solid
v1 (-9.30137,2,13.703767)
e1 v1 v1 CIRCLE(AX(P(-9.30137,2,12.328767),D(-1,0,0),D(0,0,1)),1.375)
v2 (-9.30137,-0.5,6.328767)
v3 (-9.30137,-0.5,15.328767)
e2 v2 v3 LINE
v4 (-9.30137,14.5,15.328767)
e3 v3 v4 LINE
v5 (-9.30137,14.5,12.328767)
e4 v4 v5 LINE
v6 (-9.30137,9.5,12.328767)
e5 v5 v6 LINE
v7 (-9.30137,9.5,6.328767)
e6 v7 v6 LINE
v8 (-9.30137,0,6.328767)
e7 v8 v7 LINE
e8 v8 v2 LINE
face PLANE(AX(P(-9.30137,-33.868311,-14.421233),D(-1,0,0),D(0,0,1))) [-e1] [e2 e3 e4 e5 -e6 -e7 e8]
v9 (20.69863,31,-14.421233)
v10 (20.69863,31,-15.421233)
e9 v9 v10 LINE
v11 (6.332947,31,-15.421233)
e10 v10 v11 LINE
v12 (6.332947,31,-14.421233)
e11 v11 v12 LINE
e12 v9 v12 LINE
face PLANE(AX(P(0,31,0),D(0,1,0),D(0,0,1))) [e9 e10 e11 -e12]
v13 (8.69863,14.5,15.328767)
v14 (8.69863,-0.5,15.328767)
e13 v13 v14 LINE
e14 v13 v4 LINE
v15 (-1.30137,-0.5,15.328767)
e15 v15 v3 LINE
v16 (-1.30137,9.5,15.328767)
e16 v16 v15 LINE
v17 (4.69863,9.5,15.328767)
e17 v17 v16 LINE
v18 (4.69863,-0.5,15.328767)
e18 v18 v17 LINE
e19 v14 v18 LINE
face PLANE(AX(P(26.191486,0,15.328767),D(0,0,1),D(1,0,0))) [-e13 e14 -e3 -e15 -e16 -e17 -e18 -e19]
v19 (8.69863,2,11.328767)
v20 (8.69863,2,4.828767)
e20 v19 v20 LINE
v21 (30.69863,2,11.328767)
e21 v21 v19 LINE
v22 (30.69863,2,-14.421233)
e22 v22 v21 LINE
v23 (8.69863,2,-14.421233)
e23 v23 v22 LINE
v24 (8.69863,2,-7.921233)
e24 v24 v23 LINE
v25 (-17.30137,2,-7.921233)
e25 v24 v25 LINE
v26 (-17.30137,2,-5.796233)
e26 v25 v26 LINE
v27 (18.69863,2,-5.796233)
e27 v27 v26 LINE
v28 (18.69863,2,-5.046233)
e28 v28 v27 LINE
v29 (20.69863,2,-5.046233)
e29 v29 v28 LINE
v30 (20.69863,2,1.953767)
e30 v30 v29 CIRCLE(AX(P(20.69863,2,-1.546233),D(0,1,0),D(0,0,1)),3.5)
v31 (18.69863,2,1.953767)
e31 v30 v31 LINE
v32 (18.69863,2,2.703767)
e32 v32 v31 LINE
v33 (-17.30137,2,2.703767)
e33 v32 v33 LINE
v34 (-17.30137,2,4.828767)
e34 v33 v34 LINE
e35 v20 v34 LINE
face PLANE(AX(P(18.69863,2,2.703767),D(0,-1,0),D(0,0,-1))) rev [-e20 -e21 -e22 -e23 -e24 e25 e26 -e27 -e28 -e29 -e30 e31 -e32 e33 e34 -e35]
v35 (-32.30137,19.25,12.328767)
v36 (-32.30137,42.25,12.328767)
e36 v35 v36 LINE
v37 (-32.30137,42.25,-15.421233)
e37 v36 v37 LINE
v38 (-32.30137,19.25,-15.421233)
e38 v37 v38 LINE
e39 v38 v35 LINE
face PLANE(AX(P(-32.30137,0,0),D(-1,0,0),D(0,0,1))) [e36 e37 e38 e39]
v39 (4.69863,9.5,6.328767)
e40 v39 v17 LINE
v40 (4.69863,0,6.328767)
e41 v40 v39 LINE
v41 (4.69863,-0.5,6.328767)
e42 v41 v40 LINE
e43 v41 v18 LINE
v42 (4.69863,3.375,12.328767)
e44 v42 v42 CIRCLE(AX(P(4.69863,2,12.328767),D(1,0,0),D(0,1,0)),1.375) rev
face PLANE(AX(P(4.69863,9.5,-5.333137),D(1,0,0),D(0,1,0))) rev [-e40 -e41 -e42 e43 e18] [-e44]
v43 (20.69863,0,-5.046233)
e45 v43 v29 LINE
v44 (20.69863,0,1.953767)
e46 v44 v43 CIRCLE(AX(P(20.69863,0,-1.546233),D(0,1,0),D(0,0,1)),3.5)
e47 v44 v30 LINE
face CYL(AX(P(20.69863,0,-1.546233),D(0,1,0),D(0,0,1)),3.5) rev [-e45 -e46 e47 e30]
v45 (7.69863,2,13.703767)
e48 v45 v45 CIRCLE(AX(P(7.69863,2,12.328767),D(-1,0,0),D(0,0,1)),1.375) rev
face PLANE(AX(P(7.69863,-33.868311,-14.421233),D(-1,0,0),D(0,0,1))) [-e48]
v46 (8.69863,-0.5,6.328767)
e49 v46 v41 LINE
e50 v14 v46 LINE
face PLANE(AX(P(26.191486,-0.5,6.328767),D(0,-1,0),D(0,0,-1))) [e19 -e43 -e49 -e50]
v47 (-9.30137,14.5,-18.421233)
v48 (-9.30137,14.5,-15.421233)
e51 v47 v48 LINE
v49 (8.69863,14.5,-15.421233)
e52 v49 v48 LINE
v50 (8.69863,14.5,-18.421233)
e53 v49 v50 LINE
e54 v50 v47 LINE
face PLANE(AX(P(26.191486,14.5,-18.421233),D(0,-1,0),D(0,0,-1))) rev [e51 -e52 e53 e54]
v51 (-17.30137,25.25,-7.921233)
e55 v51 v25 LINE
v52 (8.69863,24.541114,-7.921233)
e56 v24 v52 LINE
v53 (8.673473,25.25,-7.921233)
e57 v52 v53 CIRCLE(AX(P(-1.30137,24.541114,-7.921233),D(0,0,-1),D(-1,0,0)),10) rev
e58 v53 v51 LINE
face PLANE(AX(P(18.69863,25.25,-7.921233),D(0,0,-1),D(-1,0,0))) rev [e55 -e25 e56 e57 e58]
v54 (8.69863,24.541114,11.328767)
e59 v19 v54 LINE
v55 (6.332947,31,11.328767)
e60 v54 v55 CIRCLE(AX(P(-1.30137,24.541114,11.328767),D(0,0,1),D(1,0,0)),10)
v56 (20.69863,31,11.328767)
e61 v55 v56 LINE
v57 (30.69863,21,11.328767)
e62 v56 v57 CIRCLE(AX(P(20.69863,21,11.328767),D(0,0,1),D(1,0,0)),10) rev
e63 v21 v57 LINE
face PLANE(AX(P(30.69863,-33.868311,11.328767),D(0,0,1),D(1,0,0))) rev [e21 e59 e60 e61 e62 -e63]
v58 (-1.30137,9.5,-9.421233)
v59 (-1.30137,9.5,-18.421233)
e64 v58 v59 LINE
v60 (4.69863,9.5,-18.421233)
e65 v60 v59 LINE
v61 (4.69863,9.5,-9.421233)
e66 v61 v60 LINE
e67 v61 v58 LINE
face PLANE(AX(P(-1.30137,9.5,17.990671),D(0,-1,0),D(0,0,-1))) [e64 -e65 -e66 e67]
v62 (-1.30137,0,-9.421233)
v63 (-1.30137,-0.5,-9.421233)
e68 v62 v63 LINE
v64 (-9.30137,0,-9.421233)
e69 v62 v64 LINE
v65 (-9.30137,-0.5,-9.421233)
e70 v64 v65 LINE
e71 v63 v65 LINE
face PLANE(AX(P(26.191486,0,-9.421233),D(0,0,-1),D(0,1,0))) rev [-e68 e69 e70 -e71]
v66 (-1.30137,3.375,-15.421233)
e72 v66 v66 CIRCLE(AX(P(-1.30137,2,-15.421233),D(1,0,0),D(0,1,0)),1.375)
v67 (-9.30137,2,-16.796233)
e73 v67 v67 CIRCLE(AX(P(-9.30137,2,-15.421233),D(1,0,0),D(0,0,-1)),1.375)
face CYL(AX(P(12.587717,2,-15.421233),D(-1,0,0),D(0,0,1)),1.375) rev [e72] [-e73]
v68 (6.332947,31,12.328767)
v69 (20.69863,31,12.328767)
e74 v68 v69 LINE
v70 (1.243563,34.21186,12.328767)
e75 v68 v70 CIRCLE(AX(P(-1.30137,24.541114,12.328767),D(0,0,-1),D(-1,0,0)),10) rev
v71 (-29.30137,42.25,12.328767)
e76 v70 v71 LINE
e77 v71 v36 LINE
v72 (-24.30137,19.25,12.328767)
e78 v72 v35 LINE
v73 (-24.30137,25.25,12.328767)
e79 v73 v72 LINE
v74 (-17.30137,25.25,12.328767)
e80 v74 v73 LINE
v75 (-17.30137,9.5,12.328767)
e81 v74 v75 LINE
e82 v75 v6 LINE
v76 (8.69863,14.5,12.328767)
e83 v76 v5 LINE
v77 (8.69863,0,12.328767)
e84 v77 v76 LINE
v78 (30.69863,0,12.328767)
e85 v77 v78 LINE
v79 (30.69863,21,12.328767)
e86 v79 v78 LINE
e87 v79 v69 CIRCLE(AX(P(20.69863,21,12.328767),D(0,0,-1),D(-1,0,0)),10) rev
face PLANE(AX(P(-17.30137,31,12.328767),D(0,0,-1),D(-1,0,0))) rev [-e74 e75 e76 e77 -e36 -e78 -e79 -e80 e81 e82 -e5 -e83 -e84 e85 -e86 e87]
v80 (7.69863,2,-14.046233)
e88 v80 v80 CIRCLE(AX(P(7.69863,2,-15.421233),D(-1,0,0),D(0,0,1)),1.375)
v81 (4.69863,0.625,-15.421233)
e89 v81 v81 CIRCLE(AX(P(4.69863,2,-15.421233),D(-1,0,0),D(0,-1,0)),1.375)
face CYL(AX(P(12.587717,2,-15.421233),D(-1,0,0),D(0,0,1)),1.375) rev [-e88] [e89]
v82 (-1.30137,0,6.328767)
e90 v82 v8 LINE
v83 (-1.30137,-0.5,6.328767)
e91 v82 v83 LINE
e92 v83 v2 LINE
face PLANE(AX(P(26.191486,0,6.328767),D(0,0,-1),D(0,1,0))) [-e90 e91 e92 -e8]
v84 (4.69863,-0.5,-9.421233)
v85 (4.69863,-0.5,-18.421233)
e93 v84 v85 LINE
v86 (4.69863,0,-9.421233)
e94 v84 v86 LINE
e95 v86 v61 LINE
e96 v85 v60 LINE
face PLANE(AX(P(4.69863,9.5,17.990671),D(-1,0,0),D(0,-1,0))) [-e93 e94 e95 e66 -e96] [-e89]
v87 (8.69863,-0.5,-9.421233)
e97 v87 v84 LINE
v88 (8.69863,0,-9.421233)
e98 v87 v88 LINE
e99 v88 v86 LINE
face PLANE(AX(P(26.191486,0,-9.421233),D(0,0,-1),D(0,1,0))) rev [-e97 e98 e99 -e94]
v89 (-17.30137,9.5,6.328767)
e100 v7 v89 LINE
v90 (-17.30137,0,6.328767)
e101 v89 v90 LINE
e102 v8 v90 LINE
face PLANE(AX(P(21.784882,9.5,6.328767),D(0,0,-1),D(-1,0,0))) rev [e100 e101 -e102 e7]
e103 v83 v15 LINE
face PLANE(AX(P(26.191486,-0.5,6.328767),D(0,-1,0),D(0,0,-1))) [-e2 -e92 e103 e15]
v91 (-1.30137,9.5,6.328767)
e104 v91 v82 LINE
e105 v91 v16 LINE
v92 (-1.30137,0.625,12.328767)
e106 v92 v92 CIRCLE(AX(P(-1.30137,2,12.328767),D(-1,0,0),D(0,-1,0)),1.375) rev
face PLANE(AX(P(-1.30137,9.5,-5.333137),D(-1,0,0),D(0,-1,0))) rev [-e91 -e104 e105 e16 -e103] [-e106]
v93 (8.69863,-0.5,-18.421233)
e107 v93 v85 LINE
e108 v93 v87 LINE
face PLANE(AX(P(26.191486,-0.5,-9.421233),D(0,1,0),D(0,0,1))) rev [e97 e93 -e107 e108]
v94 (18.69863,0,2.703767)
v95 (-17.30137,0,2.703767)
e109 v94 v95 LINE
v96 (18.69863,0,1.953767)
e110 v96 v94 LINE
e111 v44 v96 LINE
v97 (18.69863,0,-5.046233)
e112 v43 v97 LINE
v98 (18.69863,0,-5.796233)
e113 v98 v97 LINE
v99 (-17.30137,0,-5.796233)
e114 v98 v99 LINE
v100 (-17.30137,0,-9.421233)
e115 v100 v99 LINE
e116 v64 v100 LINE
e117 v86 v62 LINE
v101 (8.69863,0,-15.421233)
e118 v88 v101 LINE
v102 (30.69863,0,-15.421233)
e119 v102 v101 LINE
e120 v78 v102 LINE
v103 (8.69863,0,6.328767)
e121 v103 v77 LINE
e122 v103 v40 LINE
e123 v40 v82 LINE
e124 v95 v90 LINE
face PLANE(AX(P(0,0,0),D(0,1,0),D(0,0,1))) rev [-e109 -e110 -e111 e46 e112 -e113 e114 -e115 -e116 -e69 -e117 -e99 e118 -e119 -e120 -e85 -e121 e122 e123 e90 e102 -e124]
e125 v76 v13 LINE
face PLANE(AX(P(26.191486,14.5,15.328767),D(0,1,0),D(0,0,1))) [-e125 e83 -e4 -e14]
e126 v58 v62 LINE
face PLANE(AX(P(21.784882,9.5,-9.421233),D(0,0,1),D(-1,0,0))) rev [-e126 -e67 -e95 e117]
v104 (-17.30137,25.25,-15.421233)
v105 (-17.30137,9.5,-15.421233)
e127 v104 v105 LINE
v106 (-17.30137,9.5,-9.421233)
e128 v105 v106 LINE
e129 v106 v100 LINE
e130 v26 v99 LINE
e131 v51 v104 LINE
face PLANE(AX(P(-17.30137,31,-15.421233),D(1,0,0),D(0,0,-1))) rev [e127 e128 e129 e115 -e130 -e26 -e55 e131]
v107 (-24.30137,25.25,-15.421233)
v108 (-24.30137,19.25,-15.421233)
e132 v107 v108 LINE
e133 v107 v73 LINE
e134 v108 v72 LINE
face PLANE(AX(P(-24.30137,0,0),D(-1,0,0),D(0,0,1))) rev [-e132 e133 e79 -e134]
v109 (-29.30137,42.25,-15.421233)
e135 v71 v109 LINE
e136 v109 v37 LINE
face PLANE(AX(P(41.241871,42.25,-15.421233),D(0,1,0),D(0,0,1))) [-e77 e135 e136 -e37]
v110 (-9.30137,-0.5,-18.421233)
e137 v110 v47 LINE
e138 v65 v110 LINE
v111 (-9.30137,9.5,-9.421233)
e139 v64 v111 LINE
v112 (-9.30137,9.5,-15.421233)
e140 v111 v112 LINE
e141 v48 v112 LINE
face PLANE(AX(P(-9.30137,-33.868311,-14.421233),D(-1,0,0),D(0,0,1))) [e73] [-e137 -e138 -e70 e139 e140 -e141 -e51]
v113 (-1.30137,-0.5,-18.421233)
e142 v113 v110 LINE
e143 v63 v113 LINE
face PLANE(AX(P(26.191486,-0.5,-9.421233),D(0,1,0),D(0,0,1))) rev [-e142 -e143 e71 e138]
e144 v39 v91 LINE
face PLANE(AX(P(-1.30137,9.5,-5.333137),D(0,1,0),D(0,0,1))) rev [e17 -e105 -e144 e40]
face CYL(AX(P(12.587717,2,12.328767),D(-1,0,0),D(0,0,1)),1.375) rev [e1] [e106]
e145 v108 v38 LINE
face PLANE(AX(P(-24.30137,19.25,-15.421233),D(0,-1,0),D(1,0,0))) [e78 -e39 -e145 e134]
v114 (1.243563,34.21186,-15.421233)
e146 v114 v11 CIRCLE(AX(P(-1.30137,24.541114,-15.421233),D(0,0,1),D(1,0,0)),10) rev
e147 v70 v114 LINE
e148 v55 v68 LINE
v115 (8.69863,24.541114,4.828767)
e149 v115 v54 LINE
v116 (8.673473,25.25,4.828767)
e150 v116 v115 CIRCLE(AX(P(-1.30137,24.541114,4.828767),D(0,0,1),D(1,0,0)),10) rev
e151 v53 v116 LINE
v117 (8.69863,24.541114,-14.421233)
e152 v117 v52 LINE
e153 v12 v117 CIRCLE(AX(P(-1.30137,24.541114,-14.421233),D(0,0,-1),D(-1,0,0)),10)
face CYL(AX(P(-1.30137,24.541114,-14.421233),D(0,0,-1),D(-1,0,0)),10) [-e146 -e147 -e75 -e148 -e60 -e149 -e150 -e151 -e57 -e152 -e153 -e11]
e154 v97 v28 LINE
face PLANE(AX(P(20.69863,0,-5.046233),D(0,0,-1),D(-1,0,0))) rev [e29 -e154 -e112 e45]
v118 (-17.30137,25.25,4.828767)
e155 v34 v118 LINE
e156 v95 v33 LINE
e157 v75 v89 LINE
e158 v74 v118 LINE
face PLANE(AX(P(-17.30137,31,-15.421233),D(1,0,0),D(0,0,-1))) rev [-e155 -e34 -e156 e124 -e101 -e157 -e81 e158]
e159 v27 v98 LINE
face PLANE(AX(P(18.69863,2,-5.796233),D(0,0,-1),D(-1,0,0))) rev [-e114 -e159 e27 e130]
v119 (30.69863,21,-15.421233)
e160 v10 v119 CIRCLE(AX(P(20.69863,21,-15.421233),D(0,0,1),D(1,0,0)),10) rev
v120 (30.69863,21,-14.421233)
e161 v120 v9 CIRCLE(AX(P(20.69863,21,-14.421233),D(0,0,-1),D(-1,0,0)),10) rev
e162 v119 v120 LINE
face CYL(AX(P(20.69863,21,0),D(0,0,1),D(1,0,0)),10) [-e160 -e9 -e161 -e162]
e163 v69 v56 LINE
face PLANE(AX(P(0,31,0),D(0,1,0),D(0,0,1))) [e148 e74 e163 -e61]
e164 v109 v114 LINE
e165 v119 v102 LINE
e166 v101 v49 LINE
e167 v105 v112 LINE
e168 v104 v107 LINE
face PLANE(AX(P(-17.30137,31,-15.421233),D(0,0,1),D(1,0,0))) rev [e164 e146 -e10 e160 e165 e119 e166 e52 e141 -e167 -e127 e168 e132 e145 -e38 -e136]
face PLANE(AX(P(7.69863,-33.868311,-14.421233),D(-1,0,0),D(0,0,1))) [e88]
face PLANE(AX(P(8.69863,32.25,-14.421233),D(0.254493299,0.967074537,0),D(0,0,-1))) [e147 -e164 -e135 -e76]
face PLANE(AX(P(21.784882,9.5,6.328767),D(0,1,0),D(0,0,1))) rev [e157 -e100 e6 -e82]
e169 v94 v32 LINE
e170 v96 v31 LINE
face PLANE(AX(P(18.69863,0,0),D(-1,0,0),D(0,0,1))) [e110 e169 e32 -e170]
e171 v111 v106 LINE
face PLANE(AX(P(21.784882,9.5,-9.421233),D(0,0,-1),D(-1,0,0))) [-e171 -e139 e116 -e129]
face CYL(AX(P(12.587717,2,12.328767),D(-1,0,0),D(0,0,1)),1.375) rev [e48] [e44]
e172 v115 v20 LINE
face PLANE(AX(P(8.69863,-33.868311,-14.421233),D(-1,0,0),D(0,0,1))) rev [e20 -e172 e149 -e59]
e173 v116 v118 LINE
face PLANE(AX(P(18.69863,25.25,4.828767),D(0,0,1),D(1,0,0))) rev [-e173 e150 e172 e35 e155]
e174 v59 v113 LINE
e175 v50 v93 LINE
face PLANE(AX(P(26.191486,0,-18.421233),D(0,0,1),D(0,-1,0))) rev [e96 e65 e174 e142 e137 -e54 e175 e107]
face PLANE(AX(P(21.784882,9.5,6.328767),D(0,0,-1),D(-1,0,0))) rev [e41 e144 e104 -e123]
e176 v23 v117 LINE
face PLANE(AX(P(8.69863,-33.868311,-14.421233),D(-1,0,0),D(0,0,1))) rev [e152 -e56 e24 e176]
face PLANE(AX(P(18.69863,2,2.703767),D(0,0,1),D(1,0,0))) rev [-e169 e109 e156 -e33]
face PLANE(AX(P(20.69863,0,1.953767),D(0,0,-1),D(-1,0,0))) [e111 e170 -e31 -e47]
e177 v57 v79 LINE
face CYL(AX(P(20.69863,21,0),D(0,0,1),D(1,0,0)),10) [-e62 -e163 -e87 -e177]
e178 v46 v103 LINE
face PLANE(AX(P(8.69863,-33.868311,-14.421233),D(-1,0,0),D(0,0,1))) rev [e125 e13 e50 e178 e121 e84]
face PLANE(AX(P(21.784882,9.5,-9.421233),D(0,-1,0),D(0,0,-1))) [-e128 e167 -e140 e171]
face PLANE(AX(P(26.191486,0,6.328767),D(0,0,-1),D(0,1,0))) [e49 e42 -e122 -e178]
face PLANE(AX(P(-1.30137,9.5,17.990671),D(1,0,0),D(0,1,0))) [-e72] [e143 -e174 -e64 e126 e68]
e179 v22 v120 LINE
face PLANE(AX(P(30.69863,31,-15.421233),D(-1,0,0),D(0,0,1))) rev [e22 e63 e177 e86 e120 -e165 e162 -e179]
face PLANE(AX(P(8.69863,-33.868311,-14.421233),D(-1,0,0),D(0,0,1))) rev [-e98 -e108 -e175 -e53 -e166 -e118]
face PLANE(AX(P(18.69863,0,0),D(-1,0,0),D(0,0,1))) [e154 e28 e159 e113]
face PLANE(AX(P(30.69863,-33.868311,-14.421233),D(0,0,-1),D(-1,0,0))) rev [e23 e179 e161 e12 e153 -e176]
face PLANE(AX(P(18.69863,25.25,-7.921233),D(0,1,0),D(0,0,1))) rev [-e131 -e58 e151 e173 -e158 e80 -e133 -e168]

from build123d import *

# Parameters (mm, degrees)
SKETCH1_W           = 48
SKETCH1_H           = 27.75
BOSS_EXTRUDE1_DEPTH = 31
CUT_EXTRUDE1_DEPTH  = 36
SKETCH3_W           = 22
SKETCH3_H           = 25.75
CUT_EXTRUDE2_DEPTH  = 29
CUT_EXTRUDE3_DEPTH  = 45.957983893
BOSS_EXTRUDE2_START = -26
SKETCH5_W           = 27.75
SKETCH5_H           = 17
BOSS_EXTRUDE2_DEPTH = 41
SKETCH10_W          = 27.75
SKETCH10_H          = 23
BOSS_EXTRUDE4_DEPTH = 8
CHAMFER1_SIZE       = 38
CHAMFER1_SIZE2      = 10
FILLET1_R           = 10
SKETCH6_W           = 9
SKETCH6_H           = 9.5
CUT_EXTRUDE4_DEPTH  = 8
BOSS_EXTRUDE3_DEPTH = 18
SKETCH8_R           = 1.375
CUT_EXTRUDE5_DEPTH  = 17
SKETCH9_W           = 6
SKETCH9_H           = 10
CUT_EXTRUDE6_DEPTH  = 9


with BuildPart() as part:
    # Sketch1 → Boss-Extrude1 (new body)
    with BuildSketch(Plane(origin=(0, 0, 0), x_dir=(1, 0, 0), z_dir=(0, 1, 0))):
        with Locations((6.698630137, 1.546232877)):
            Rectangle(SKETCH1_W, SKETCH1_H)
    extrude(amount=BOSS_EXTRUDE1_DEPTH)

    # Sketch2 → Cut-Extrude1 (cut)
    with BuildSketch(Plane.ZY.offset(17.301369863)):
        Polygon((-7.921232877, 25.25), (4.828767123, 25.25), (4.828767123, 2), (2.703767123, 2), (2.703767123, 0), (-5.796232877, 0), (-5.796232877, 2), (-7.921232877, 2), align=None)
    extrude(amount=-CUT_EXTRUDE1_DEPTH, mode=Mode.SUBTRACT)

    # Sketch3 → Cut-Extrude2 (cut)
    with BuildSketch(Plane(origin=(0, 31, 0), x_dir=(1, 0, 0), z_dir=(0, 1, 0))):
        with Locations((19.698630137, 1.546232877)):
            Rectangle(SKETCH3_W, SKETCH3_H)
    extrude(amount=-CUT_EXTRUDE2_DEPTH, mode=Mode.SUBTRACT)

    # Sketch4 → Cut-Extrude3 (cut, through all)
    with BuildSketch(Plane(origin=(0, 2, 0), x_dir=(1, 0, 0), z_dir=(0, 1, 0))):
        with BuildLine():
            Line((20.698630137, -1.953767123), (18.698630137, -1.953767123))
            ThreePointArc((18.698630137, -1.953767123), (15.198630137, 1.546232877), (18.698630137, 5.046232877))
            Line((18.698630137, 5.046232877), (20.698630137, 5.046232877))
            ThreePointArc((20.698630137, 5.046232877), (24.198630137, 1.546232877), (20.698630137, -1.953767123))
        make_face()
    extrude(amount=-CUT_EXTRUDE3_DEPTH, mode=Mode.SUBTRACT)

    # Sketch5 → Boss-Extrude2 (add)
    with BuildSketch(Plane.ZY.offset(17.301369863).offset(BOSS_EXTRUDE2_START)):
        with Locations((-1.546232877, 33.75)):
            Rectangle(SKETCH5_W, SKETCH5_H)
    extrude(amount=BOSS_EXTRUDE2_DEPTH)

    # Sketch10 → Boss-Extrude4 (add)
    with BuildSketch(Plane.ZY.offset(32.301369863)):
        with Locations((-1.546232877, 30.75)):
            Rectangle(SKETCH10_W, SKETCH10_H)
    extrude(amount=-BOSS_EXTRUDE4_DEPTH)

    # Chamfer1
    chamfer1_edges = [part.edges().sort_by_distance(p)[0] for p in [
        (8.698630137, 42.25, -1.546232877),
    ]]
    chamfer1_side = [part.faces().sort_by_distance(p)[0] for p in [
        (-11.801369863, 42.25, -1.546232877),
    ]]
    chamfer(chamfer1_edges, length=CHAMFER1_SIZE, length2=CHAMFER1_SIZE2, reference=chamfer1_side[0])

    # Fillet1
    # the kernel refuses this fillet: 10 mm, written as the material it takes off along each edge
    with BuildSketch(Plane(origin=(30.698630137, 31, -40.421232877), x_dir=(-1, 0, 0), z_dir=(0, 0, 1))) as fillet1_piece_1:
        with BuildLine():
            CenterArc((FILLET1_R, FILLET1_R), FILLET1_R, 180, 90)
            Line((0, FILLET1_R), (0, 0))
            Line((0, 0), (FILLET1_R, 0))
        make_face()
    extrude(amount=51, mode=Mode.SUBTRACT)
    with BuildSketch(Plane(origin=(30.698630137, 31, -13.671232877), x_dir=(0, -1, 0), z_dir=(0, 0, 1))) as fillet1_piece_2:
        with BuildLine():
            CenterArc((FILLET1_R, -FILLET1_R), FILLET1_R, 90, 90)
            Line((0, -FILLET1_R), (0, 0))
            Line((0, 0), (FILLET1_R, 0))
        make_face()
    extrude(amount=51, mode=Mode.SUBTRACT)
    with BuildSketch(Plane(origin=(8.698630137, 32.25, -34.693446961), x_dir=(-0.9670745372626461, 0.25449329927964454, 0), z_dir=(0, 0, 1))) as fillet1_piece_3_section:
        with BuildLine():
            CenterArc((FILLET1_R * 0.770888563389, FILLET1_R), FILLET1_R, 194.743562836, 75.256437164)
            Line((-FILLET1_R * 0.196185973874, FILLET1_R * 0.74550670072), (0, 0))
            Line((0, 0), (FILLET1_R * 0.770888563389, 0))
        make_face()
    fillet1_piece_3 = extrude(amount=66.294428169, mode=Mode.PRIVATE)
    fillet1_piece_3 = split(fillet1_piece_3, bisect_by=Plane(origin=(6.418470389, 31, -14.921232877), z_dir=(0, 1, 0)), keep=Keep.TOP, mode=Mode.PRIVATE)
    add(fillet1_piece_3, mode=Mode.SUBTRACT)
    with BuildSketch(Plane(origin=(8.698630137, 32.25, -34.693446961), x_dir=(-0.9670745372626461, 0.25449329927964454, 0), z_dir=(0, 0, 1))) as fillet1_piece_4_section:
        with BuildLine():
            CenterArc((FILLET1_R * 0.770888563389, FILLET1_R), FILLET1_R, 194.743562836, 75.256437164)
            Line((-FILLET1_R * 0.196185973874, FILLET1_R * 0.74550670072), (0, 0))
            Line((0, 0), (FILLET1_R * 0.770888563389, 0))
        make_face()
    fillet1_piece_4 = extrude(amount=66.294428169, mode=Mode.PRIVATE)
    fillet1_piece_4 = split(fillet1_piece_4, bisect_by=Plane(origin=(8.005221355, 29.431341636, -14.421232877), z_dir=(0, 0, 1)), keep=Keep.TOP, mode=Mode.PRIVATE)
    fillet1_piece_4 = split(fillet1_piece_4, bisect_by=Plane(origin=(8.005221355, 29.431341636, 11.328767123), z_dir=(0, 0, -1)), keep=Keep.TOP, mode=Mode.PRIVATE)
    add(fillet1_piece_4, mode=Mode.SUBTRACT)

    # Sketch6 → Cut-Extrude4 (cut)
    with BuildSketch(Plane.ZY.offset(17.301369863)):
        with Locations((10.828767123, 4.75)):
            Rectangle(SKETCH6_W, SKETCH6_H)
    cut_extrude4 = extrude(amount=-CUT_EXTRUDE4_DEPTH, mode=Mode.SUBTRACT)

    # Sketch7 → Boss-Extrude3 (add)
    with BuildSketch(Plane.ZY.offset(9.301369863)):
        Polygon((12.328767123, 0), (12.328767123, 9.5), (12.328767123, 14.5), (15.328767123, 14.5), (15.328767123, 9.5), (15.328767123, 0), (15.328767123, -0.5), (6.328767123, -0.5), (6.328767123, 0), align=None)
    boss_extrude3 = extrude(amount=-BOSS_EXTRUDE3_DEPTH)

    # Sketch8 → Cut-Extrude5 (cut)
    with BuildSketch(Plane.ZY.offset(9.301369863)):
        with Locations((12.328767123, 2)):
            Circle(SKETCH8_R)
    cut_extrude5 = extrude(amount=-CUT_EXTRUDE5_DEPTH, mode=Mode.SUBTRACT)

    # Sketch9 → Cut-Extrude6 (cut)
    with BuildSketch(Plane.XY.offset(15.328767123)):
        with Locations((1.698630137, 4.5)):
            Rectangle(SKETCH9_W, SKETCH9_H)
    cut_extrude6 = extrude(amount=-CUT_EXTRUDE6_DEPTH, mode=Mode.SUBTRACT)

    # Mirror1: Cut-Extrude4, Boss-Extrude3, Cut-Extrude5, Cut-Extrude6 across plane
    add(cut_extrude4.mirror(Plane.XY.offset(-1.546232877)), mode=Mode.SUBTRACT)
    add(boss_extrude3.mirror(Plane.XY.offset(-1.546232877)))
    add(cut_extrude5.mirror(Plane.XY.offset(-1.546232877)), mode=Mode.SUBTRACT)
    add(cut_extrude6.mirror(Plane.XY.offset(-1.546232877)), mode=Mode.SUBTRACT)


solid = part.part
